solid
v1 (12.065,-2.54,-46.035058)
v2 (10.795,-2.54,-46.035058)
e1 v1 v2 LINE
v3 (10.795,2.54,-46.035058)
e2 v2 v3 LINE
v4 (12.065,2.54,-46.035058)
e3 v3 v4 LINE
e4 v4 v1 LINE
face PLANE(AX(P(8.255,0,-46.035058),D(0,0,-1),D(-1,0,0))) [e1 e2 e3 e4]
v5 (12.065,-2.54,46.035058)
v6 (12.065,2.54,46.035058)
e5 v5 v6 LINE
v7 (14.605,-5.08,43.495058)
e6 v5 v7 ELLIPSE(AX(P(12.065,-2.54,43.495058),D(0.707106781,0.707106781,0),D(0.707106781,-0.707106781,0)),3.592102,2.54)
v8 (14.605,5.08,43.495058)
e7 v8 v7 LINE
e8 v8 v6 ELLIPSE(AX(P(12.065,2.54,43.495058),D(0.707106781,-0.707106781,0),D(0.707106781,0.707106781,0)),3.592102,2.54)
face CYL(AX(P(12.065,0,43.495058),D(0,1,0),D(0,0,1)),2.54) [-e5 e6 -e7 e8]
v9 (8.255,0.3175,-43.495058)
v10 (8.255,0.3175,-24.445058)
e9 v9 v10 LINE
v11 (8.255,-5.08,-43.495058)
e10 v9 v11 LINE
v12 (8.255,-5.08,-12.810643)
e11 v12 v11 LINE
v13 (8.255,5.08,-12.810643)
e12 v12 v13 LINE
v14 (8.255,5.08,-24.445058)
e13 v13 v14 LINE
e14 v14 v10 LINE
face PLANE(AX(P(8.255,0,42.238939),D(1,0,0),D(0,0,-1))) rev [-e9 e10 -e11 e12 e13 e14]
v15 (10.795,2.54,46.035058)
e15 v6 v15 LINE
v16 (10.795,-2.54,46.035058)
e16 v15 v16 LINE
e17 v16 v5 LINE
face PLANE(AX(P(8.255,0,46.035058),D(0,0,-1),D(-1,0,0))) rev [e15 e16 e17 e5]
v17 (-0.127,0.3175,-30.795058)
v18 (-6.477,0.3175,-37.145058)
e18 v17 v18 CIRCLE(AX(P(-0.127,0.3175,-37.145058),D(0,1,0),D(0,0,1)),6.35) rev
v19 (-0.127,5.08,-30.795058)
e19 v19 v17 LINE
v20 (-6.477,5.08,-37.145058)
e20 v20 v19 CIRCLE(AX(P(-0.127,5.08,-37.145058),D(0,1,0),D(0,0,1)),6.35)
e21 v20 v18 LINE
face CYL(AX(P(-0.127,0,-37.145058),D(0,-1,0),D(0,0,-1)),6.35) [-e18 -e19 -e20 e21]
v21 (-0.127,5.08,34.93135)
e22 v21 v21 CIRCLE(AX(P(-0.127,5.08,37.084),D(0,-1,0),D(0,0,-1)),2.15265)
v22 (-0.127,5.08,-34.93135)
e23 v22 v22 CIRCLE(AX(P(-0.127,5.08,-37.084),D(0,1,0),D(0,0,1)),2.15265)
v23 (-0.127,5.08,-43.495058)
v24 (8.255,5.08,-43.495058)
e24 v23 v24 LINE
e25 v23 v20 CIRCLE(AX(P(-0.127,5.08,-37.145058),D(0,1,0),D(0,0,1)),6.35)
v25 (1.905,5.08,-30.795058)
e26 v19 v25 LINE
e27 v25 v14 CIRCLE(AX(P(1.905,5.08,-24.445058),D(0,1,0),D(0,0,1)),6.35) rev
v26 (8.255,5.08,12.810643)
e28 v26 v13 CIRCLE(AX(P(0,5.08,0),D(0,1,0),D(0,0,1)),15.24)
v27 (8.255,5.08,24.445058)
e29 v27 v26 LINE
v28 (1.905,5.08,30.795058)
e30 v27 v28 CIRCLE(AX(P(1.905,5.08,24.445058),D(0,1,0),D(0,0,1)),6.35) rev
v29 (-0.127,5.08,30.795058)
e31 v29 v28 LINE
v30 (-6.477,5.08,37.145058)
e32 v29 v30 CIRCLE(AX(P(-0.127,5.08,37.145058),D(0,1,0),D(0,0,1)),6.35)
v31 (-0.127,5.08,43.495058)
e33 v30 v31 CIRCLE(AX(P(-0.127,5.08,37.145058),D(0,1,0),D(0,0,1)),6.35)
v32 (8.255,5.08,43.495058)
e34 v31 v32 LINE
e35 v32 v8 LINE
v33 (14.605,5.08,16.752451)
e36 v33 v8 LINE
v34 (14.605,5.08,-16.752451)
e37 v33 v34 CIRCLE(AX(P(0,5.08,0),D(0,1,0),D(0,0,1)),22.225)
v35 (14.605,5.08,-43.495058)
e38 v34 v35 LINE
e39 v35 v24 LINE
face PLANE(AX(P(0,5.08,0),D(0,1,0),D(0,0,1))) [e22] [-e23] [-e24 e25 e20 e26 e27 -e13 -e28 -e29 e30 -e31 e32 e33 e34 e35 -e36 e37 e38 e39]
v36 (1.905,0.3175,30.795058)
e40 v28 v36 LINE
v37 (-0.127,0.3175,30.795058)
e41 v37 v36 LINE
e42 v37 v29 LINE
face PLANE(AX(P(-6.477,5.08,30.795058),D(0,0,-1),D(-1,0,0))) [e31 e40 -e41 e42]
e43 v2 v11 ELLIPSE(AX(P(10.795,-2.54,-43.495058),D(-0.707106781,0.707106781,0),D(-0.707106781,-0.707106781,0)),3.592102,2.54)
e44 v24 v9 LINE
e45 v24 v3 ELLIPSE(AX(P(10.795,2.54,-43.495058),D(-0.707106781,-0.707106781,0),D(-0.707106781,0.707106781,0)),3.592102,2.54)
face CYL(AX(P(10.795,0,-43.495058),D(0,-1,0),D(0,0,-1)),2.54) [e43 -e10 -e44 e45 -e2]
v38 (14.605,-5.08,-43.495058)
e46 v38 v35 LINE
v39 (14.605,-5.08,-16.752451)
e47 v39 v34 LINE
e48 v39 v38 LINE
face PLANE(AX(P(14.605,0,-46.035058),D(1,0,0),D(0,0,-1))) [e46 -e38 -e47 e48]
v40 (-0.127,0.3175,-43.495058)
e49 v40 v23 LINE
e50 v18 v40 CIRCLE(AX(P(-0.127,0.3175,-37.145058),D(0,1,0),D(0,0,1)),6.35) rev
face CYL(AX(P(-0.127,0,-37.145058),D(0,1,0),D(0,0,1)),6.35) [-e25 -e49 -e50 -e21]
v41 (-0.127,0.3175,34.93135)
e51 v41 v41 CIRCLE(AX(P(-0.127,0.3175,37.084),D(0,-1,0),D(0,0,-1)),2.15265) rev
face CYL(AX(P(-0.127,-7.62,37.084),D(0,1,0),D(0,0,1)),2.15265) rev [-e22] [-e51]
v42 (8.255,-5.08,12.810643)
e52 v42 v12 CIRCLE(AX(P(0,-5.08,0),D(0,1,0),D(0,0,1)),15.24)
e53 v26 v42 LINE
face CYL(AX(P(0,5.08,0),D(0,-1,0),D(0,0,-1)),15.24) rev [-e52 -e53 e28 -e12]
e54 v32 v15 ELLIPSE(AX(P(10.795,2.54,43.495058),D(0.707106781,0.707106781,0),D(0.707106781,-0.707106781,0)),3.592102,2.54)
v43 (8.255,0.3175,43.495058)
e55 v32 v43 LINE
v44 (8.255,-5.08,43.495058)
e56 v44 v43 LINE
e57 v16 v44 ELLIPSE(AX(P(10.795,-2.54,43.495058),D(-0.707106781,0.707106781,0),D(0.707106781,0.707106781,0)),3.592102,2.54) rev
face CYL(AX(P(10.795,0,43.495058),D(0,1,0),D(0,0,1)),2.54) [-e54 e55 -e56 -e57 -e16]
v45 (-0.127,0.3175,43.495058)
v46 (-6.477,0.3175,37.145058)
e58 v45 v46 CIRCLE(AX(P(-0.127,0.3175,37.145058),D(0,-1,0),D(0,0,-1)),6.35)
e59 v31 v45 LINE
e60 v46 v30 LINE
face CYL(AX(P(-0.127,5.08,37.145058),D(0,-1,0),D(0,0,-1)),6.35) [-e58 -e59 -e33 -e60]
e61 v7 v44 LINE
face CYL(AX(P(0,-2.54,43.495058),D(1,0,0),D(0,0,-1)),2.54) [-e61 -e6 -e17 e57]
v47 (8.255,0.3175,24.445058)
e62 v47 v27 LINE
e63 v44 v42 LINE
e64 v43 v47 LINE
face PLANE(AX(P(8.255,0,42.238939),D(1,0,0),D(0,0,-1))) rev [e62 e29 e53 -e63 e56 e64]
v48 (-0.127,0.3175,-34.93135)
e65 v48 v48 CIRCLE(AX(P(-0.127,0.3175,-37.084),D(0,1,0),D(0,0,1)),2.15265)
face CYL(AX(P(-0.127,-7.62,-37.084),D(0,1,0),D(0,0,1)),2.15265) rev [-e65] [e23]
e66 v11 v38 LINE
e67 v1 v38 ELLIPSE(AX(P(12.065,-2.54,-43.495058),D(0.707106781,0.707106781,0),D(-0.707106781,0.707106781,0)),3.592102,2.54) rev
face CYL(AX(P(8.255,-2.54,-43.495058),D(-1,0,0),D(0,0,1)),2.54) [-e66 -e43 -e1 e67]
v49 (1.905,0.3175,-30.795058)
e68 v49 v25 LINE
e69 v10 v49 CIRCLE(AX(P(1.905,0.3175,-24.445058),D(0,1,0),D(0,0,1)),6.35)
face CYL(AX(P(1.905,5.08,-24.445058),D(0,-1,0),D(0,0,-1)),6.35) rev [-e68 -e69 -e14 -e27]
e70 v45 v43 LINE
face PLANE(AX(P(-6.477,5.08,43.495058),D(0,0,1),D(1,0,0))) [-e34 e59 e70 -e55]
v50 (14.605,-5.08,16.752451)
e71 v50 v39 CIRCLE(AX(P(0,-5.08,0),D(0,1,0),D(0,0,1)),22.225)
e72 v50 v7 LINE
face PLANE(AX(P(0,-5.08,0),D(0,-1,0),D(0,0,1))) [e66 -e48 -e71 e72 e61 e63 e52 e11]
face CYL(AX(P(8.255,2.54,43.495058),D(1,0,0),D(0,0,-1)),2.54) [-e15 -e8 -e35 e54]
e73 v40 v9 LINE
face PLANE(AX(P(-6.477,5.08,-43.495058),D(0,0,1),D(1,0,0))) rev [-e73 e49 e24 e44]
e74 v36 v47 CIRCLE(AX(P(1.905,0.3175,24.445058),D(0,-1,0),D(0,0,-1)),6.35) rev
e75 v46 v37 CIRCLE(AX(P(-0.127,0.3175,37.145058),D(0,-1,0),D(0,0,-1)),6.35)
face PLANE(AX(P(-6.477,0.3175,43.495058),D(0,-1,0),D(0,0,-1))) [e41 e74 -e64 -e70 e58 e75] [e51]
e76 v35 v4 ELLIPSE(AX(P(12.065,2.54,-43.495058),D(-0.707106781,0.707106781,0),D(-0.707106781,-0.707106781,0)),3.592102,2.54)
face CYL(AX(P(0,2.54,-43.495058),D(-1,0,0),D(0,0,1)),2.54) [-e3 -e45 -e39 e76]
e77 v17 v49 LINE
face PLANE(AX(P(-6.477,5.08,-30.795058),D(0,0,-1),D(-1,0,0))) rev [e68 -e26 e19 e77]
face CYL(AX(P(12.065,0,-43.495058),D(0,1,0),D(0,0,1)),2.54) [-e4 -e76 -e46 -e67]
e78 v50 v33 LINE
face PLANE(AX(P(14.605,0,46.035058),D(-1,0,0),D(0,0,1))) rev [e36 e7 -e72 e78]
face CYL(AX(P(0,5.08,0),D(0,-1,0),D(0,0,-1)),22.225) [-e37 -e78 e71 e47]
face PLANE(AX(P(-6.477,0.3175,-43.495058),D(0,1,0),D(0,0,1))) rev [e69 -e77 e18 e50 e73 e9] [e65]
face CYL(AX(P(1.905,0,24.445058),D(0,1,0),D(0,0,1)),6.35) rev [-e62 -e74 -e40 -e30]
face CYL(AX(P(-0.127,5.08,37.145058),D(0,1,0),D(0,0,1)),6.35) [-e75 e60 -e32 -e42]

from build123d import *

# Parameters (mm, degrees)
SKETCH1_R            = 22.225
SKETCH1_R_2          = 15.24
BOSS_EXTRUDE1_DEPTH  = 5.08
SKETCH6_W            = 64.917410467
SKETCH6_H            = 82.171101747
CUT_EXTRUDE2_DEPTH   = 32.838775887
BOSS_EXTRUDE3_DEPTH  = 5.08
MIRROR2_COPY_1_DEPTH = 5.08
FILLET5_R            = 2.54
SKETCH15_W           = 12.7
SKETCH15_H           = 4.7625
BOSS_EXTRUDE5_DEPTH  = 14.732
SKETCH17_R           = 2.15265
CUT_EXTRUDE5_DEPTH   = 12.7
FILLET6_R            = 6.35
FILLET6_OF_MIRROR3_R = 6.35


with BuildPart() as part:
    # Sketch1 → Boss-Extrude1 (new body)
    with BuildSketch(Plane(origin=(0, 0, 0), x_dir=(1, 0, 0), z_dir=(0, 1, 0))):
        with Locations(Location((0, 0, 0), (0, 0, 270))):
            Circle(SKETCH1_R)
        with Locations(Location((0, 0, 0), (0, 0, 270))):
            Circle(SKETCH1_R_2, mode=Mode.SUBTRACT)
    boss_extrude1 = extrude(amount=BOSS_EXTRUDE1_DEPTH)

    # Sketch6 → Cut-Extrude2 (cut, through all)
    with BuildSketch(Plane(origin=(0, 5.08, 0), x_dir=(1, 0, 0), z_dir=(0, 1, 0))):
        with Locations((-24.203705233, -1.153387837)):
            Rectangle(SKETCH6_W, SKETCH6_H)
    cut_extrude2 = extrude(amount=-CUT_EXTRUDE2_DEPTH, mode=Mode.SUBTRACT)

    # Sketch9 → Boss-Extrude3 (add)
    with BuildSketch(Plane(origin=(0, 5.08, 0), x_dir=(1, 0, 0), z_dir=(0, 1, 0))):
        Polygon((8.255, 20.635057548), (8.255, 46.035057548), (14.605, 46.035057548), (14.605, 16.752450567), align=None)
    boss_extrude3 = extrude(amount=-BOSS_EXTRUDE3_DEPTH)

    # Mirror1: Boss-Extrude3 across plane
    add(boss_extrude3.mirror(Plane.XY))

    # Mirror2: Boss-Extrude1, Cut-Extrude2, Boss-Extrude3 across plane
    add(boss_extrude1.mirror(Plane.ZX))
    add(cut_extrude2.mirror(Plane.ZX), mode=Mode.SUBTRACT)
    add(boss_extrude3.mirror(Plane.ZX))

    # Mirror2 copy 1 sketch → Mirror2 copy 1 (add)
    with BuildSketch(Plane.XZ.offset(5.08)):
        Polygon((8.255, 20.635057548), (8.255, 46.035057548), (14.605, 46.035057548), (14.605, 16.752450567), align=None)
    extrude(amount=-MIRROR2_COPY_1_DEPTH)

    # Fillet5
    fillet5_edges = [part.edges().sort_by_distance(p)[0] for p in [
        (11.43, -5.08, -46.035057548),
        (11.43, -5.08, 46.035057548),
        (11.43, 5.08, -46.035057548),
        (8.255, 0, -46.035057548),
        (14.605, 0, -46.035057548),
        (11.43, 5.08, 46.035057548),
        (14.605, 0, 46.035057548),
        (8.255, 0, 46.035057548),
    ]]
    fillet(fillet5_edges, radius=FILLET5_R)

    # Sketch15 → Boss-Extrude5 (add)
    with BuildSketch(Plane.ZY.offset(-8.255)):
        with Locations((-37.145057548, 2.69875)):
            Rectangle(SKETCH15_W, SKETCH15_H)
    boss_extrude5 = extrude(amount=BOSS_EXTRUDE5_DEPTH)

    # Sketch17 → Cut-Extrude5 (cut)
    with BuildSketch(Plane(origin=(0, 5.08, 0), x_dir=(1, 0, 0), z_dir=(0, 1, 0))):
        with Locations(Location((-0.127, 37.084, 0), (0, 0, 270))):
            Circle(SKETCH17_R)
    cut_extrude5 = extrude(amount=-CUT_EXTRUDE5_DEPTH, mode=Mode.SUBTRACT)

    # Fillet6
    fillet6_edges = [part.edges().sort_by_distance(p)[0] for p in [
        (8.255, 2.69875, -30.795057548),
        (-6.477, 2.69875, -30.795057548),
        (-6.477, 2.69875, -43.495057548),
    ]]
    fillet(fillet6_edges, radius=FILLET6_R - 0.0001)  # a hair under: the kernel refuses the full size

    # Mirror3: Boss-Extrude5, Cut-Extrude5 across plane
    add(boss_extrude5.mirror(Plane.XY))
    add(cut_extrude5.mirror(Plane.XY), mode=Mode.SUBTRACT)

    # Fillet6 of Mirror3
    fillet6_of_mirror3_edges = [part.edges().sort_by_distance(p)[0] for p in [
        (8.255, 2.69875, 30.795057548),
        (-6.477, 2.69875, 30.795057548),
        (-6.477, 2.69875, 43.495057548),
    ]]
    fillet(fillet6_of_mirror3_edges, radius=FILLET6_OF_MIRROR3_R - 0.0001)  # a hair under: the kernel refuses the full size


solid = part.part
